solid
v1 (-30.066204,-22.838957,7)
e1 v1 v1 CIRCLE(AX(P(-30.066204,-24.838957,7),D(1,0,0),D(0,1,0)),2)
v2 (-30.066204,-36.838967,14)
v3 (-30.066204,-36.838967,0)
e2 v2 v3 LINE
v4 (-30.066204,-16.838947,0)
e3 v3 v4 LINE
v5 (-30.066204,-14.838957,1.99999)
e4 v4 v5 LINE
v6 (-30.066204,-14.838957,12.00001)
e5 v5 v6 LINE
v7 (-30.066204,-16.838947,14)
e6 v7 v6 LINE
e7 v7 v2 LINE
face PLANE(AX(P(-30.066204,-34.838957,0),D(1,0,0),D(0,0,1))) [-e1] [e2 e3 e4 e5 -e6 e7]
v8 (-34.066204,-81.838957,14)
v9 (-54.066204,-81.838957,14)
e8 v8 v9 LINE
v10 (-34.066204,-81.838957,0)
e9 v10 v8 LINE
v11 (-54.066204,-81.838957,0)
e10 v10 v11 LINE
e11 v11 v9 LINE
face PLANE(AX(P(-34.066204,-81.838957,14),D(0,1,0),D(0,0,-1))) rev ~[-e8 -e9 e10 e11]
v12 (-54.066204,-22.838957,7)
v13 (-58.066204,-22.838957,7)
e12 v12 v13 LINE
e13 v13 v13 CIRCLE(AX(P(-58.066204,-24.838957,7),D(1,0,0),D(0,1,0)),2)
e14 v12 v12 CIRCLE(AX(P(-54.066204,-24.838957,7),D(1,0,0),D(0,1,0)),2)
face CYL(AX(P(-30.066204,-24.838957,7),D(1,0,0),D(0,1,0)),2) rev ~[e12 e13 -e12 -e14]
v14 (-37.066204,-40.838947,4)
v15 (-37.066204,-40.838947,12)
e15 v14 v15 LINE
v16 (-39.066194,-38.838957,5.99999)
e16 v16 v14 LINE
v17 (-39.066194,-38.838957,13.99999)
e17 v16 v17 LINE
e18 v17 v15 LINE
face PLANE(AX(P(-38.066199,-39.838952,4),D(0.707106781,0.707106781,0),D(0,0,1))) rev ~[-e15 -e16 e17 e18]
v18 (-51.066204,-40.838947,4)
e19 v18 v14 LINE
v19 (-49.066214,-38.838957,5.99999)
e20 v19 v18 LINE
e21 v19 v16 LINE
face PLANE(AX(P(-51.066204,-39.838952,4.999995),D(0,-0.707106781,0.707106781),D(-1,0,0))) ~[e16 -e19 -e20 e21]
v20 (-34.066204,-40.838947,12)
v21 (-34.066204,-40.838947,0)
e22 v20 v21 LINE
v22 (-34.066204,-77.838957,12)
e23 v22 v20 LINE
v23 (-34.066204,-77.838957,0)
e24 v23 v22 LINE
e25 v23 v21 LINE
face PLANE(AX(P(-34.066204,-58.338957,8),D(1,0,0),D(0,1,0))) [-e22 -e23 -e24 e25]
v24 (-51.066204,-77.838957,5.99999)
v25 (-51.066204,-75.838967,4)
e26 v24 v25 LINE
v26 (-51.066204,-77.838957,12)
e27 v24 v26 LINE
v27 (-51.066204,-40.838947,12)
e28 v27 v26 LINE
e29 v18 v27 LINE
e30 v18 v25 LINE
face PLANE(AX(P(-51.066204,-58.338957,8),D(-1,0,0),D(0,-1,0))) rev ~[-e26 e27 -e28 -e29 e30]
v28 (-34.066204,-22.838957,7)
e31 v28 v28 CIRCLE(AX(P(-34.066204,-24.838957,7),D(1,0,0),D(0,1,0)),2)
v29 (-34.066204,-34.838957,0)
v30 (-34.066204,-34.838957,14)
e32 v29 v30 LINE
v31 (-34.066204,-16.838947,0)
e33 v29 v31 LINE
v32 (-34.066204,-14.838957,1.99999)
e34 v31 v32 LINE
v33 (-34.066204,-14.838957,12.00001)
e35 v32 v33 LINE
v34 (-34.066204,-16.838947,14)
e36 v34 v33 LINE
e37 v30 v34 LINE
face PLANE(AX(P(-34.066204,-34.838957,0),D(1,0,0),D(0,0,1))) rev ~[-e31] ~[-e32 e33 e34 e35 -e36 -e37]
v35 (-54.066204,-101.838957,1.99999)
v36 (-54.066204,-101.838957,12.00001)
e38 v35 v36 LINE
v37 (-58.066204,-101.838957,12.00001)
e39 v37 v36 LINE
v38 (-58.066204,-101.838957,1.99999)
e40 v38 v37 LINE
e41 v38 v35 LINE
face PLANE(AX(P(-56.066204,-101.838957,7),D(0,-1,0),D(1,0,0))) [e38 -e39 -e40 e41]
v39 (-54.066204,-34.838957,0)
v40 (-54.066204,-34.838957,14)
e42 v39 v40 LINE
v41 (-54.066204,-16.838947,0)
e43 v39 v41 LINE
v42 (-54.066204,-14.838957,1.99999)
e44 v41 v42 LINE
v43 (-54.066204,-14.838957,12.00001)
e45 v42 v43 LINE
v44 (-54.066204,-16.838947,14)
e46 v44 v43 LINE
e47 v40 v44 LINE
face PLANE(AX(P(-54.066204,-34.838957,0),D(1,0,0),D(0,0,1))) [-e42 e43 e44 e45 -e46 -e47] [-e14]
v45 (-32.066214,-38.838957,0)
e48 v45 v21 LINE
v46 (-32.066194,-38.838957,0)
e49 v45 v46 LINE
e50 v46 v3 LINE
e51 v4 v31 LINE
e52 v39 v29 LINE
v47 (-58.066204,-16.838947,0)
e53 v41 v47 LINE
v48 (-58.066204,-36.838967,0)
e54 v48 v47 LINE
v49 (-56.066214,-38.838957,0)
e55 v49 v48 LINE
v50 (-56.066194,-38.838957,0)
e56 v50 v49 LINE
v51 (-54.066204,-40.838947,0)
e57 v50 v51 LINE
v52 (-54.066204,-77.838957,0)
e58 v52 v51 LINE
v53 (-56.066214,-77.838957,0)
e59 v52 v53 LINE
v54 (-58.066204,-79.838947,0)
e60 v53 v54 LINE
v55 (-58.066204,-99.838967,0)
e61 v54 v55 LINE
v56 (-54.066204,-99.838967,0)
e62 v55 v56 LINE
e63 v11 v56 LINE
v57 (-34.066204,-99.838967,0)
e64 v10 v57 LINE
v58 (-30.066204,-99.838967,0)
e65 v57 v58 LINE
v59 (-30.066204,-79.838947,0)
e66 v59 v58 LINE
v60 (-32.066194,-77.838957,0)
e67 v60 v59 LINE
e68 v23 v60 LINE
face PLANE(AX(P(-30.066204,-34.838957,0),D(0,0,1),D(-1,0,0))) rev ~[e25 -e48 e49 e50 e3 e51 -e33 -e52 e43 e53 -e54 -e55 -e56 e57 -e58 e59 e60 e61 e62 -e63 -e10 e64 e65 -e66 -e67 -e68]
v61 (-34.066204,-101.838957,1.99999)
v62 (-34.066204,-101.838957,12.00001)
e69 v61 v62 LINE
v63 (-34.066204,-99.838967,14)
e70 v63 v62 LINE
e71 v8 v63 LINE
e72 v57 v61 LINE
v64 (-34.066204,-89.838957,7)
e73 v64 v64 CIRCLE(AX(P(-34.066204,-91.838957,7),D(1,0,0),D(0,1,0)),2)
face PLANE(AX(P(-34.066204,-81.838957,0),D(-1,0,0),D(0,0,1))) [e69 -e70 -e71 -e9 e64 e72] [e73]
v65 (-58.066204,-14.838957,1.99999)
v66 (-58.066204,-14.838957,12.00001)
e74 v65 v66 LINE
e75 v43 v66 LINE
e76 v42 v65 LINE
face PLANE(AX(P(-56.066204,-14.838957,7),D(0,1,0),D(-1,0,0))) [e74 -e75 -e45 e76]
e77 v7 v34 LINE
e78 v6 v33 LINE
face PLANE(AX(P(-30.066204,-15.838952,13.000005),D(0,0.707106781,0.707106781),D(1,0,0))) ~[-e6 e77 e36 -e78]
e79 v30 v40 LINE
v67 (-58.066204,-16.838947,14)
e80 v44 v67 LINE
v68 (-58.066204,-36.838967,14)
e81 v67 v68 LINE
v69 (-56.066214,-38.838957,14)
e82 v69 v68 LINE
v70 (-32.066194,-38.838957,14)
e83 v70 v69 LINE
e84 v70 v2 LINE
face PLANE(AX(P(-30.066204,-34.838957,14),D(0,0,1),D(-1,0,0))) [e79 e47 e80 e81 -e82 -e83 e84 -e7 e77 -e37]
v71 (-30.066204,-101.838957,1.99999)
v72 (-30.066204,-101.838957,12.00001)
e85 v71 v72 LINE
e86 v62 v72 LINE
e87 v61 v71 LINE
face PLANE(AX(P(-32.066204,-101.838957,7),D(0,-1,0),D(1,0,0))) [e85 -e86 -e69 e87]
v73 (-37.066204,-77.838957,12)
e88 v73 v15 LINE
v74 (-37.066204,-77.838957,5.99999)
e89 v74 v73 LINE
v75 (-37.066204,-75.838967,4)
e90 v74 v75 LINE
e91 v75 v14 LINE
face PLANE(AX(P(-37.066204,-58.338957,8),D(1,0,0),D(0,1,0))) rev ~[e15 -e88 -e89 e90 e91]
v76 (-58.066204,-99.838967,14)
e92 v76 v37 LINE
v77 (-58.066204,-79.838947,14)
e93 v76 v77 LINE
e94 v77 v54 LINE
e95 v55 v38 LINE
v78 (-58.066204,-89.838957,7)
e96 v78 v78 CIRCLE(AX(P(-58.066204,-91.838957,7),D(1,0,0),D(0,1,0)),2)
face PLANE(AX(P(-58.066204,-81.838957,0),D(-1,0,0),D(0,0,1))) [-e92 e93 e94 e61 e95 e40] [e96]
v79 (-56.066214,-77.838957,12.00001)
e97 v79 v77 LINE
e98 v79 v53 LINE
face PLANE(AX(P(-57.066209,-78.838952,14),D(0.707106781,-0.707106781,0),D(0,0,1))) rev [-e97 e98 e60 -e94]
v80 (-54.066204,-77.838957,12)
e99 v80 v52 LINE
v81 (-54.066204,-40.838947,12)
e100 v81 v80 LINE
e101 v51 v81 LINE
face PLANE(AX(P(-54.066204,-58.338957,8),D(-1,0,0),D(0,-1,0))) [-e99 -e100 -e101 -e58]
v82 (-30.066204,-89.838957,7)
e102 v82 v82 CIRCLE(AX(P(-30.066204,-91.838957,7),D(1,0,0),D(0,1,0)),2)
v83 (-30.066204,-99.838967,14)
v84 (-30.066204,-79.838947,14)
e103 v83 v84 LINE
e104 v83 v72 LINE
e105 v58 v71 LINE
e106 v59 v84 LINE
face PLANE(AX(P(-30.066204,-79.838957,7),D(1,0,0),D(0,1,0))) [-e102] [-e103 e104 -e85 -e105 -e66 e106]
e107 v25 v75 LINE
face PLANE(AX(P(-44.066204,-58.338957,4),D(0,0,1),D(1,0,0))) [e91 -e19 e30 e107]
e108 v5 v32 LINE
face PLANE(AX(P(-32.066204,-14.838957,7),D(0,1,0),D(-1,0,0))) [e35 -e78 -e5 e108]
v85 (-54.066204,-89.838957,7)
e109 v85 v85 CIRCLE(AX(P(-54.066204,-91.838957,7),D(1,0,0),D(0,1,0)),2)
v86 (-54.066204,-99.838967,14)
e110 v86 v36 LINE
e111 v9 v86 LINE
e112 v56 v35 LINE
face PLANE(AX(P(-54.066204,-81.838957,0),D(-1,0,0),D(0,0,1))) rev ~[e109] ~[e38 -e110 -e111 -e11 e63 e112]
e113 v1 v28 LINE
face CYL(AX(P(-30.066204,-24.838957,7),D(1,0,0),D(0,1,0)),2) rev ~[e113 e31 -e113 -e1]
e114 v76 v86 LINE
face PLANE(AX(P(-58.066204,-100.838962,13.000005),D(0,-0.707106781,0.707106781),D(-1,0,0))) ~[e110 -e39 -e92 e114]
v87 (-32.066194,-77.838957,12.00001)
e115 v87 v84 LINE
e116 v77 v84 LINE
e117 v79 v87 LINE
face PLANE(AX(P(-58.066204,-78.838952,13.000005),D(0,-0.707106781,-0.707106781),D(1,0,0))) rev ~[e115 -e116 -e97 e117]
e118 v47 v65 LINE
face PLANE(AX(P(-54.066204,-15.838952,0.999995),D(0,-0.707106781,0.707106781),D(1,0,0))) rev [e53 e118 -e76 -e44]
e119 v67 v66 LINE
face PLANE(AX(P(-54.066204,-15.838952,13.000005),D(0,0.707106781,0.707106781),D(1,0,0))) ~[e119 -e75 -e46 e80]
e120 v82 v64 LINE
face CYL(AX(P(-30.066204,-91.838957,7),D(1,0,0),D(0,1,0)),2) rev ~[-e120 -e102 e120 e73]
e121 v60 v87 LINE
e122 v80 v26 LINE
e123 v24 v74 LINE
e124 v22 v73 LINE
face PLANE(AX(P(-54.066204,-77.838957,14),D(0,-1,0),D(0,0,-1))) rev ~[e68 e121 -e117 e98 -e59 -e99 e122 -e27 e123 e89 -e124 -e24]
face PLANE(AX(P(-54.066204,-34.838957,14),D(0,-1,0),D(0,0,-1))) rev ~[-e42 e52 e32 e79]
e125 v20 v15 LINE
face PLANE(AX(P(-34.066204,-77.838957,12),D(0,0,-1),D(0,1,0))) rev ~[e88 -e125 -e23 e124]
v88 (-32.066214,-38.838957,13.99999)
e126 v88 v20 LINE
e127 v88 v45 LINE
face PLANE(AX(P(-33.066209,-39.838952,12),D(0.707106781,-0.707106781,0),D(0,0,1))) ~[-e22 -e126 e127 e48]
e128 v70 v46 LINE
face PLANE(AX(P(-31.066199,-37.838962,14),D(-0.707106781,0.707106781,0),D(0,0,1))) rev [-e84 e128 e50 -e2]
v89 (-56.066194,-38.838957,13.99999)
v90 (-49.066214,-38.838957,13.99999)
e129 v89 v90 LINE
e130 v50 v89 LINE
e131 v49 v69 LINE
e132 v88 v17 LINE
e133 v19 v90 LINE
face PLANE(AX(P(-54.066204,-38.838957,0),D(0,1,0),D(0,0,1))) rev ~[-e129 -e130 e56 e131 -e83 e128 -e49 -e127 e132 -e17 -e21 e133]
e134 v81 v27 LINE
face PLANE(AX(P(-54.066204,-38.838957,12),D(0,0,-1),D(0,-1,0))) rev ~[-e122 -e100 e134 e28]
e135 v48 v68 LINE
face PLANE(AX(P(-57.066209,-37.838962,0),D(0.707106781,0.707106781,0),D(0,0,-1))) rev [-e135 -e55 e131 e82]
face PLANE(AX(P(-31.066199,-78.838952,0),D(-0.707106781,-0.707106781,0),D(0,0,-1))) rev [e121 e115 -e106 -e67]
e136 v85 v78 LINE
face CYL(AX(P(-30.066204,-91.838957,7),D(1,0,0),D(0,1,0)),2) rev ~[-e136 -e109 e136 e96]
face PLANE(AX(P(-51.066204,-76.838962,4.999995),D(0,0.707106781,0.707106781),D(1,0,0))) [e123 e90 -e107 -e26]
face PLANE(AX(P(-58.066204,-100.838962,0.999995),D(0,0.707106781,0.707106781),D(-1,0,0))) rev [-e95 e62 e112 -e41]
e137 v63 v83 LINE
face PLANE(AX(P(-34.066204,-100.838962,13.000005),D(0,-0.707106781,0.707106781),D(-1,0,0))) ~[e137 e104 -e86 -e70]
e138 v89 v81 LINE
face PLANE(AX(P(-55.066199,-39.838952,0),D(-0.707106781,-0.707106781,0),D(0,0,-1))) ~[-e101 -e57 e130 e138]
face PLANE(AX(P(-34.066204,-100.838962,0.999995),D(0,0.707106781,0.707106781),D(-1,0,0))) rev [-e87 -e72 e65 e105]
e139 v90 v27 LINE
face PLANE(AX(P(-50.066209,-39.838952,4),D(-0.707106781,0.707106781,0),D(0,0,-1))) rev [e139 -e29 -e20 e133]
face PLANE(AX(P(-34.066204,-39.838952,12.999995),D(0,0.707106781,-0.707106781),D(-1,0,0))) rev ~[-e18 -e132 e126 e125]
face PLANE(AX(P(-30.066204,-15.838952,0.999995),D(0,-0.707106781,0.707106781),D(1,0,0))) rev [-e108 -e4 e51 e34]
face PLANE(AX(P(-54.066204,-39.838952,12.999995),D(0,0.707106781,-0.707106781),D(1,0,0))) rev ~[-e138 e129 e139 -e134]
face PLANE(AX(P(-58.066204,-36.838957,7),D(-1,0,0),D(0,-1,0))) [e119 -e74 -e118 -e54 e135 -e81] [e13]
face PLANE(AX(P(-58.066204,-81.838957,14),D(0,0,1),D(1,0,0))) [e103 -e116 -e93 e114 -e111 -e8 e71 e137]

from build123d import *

# Parameters (mm, degrees)
F0_W            = 20
F0_H            = 22
F0_H_2          = 4
F0_H_3          = 20.4
F1_DEPTH        = 2
F2_DEPTH        = 10
F3_R            = 2.2
F4_DEPTH        = 30
F5_W            = 20
F5_H            = 12
F5_R            = 2.6
F7_DEPTH        = 4
F6_W            = 20
F6_H            = 12
F6_R            = 2.6
F8_DEPTH        = 4
F9_T1_DEPTH     = 25
F9_T3_DEPTH     = 57.4
F9_T5_DEPTH     = 16
F9_T7_DEPTH     = 48.4
F9_T9_DEPTH     = 2
F9_T11_DEPTH    = 20
F9_T13_DEPTH    = 7
F9_T15_DEPTH    = 25
F9_T17_DEPTH    = 14
F9_T19_DEPTH    = 27
F9_T21_DEPTH    = 14
F9_T23_DEPTH    = 30
F9_T25_DEPTH    = 7
F9_T27_DEPTH    = 8
F9_S31_W        = 2
F9_S31_H        = 2
F9_T32_DEPTH    = 2
F9_S37_W        = 2
F9_S37_H        = 2
F9_T38_DEPTH    = 2
F9_S43_W        = 2
F9_S43_H        = 2
F9_T44_DEPTH    = 2
F9_S49_W        = 2
F9_S49_H        = 2
F9_T50_DEPTH    = 2
F9_S55_W        = 2
F9_S55_H        = 2
F9_T56_DEPTH    = 2
F9_S61_W        = 2
F9_S61_H        = 2
F9_T62_DEPTH    = 2
F9_S67_W        = 2
F9_S67_H        = 2
F9_T68_DEPTH    = 2
F9_S73_W        = 2
F9_S73_H        = 2
F9_T74_DEPTH    = 2
F9_T81_DEPTH    = 30
F9_T85_DEPTH    = 30
F9_T92_DEPTH    = 7
F9_T96_DEPTH    = 53.4
F9_T103_DEPTH   = 30
F9_T107_DEPTH   = 30
F9_S1_T1_DEPTH  = 7
F9_S1_T3_DEPTH  = 30
F9_S1_T5_DEPTH  = 16
F9_S1_T7_DEPTH  = 8
F9_S1_S11_W     = 2
F9_S1_S11_H     = 2
F9_S1_T12_DEPTH = 2
F9_S1_S17_W     = 2
F9_S1_S17_H     = 2
F9_S1_T18_DEPTH = 2
F9_S1_S23_W     = 2
F9_S1_S23_H     = 2
F9_S1_T24_DEPTH = 2
F9_S1_S29_W     = 2
F9_S1_S29_H     = 2
F9_S1_T30_DEPTH = 2
F10_W           = 20
F10_H           = 47
F11_DEPTH       = 4
F12_W           = 20
F12_H           = 4
F13_DEPTH       = 10
F16_DEPTH       = 4
F17_DEPTH       = 4
F19_W           = 4
F19_H           = 14
F20_DEPTH       = 20
F18_W           = 4
F18_H           = 14
F21_DEPTH       = 20
F22_W           = 39
F22_H           = 8
F23_DEPTH       = 3
F24_W           = 39
F24_H           = 8
F25_DEPTH       = 3
F26_R           = 2
F27_R           = 2
F28_DEPTH       = 28.3421242009
F29_SIZE        = 1.99999


# Not quite as in the source:
# - a fillet or chamfer that OpenCascade refuses, or shapes differently, is made with other operations: its cross-section is extruded or revolved along the edge and cut away or added
# - a fillet or chamfer is up to 0.001 mm smaller than in the source, because OpenCascade refuses the exact size
# - a feature names something its author has since deleted; it is built from what else it names


with BuildPart() as f1:
    # F0 (on Top) → F1 (new body)
    with BuildSketch(Plane.XY):
        with Locations((-44.4073281825, 48.6883277684)):
            Rectangle(F0_W, F0_H)
        with Locations((-44.4073281825, 61.6883277684)):
            Rectangle(F0_W, F0_H_2)
        with Locations((-44.4073281825, 35.6883277684)):
            Rectangle(F0_W, F0_H_2)
        with Locations((-44.4073281825, 23.4883277684)):
            Rectangle(F0_W, F0_H_3)
        with Locations((-44.4073281825, 11.2883277684)):
            Rectangle(F0_W, F0_H_2)
    extrude(amount=-F1_DEPTH)

    # F0 (on Top) → F2 (join)
    with BuildSketch(Plane.XY):
        with Locations((-44.4073281825, 35.6883277684)):
            Rectangle(F0_W, F0_H_2)
        with Locations((-44.4073281825, 61.6883277684)):
            Rectangle(F0_W, F0_H_2)
        with Locations((-44.4073281825, 11.2883277684)):
            Rectangle(F0_W, F0_H_2)
    extrude(amount=F2_DEPTH)

    # F3 (on face) → F4 (cut)
    with BuildSketch(Plane.XZ.offset(-9.2883277684)):
        with Locations((-44.4073281825, 5.5)):
            Circle(F3_R)
    extrude(amount=-F4_DEPTH, mode=Mode.SUBTRACT)

    # F5 (on face) → F7 (join)
    with BuildSketch(Plane(origin=(-54.4073281825, 0, 0), x_dir=(0, -1, 0), z_dir=(-1, 0, 0))):
        with Locations((-73.6883277684, 4)):
            Rectangle(F5_W, F5_H)
        with Locations((-73.6883277684, 4)):
            Circle(F5_R, mode=Mode.SUBTRACT)
    extrude(amount=F7_DEPTH)

    # F6 (on face) → F8 (join)
    with BuildSketch(Plane.YZ.offset(-34.4073281825)):
        with Locations((73.6883277684, 4)):
            Rectangle(F6_W, F6_H)
        with Locations((73.6883277684, 4)):
            Circle(F6_R, mode=Mode.SUBTRACT)
        Polygon((63.6883277684, 10), (59.6883277684, 10), (59.6883277684, 0), (59.6883277684, -2), (63.6883277684, -2), align=None)
    extrude(amount=F8_DEPTH)

    # F9: fillet of radius 2 on 26 edges, made by hand

    # F9_s2 → F9_t1 (cut)
    with BuildSketch(Plane.YZ.offset(-59.4073281825)):
        with BuildLine():
            ThreePointArc((63.6883277684, 0), (63.1025413308, -1.4142135624), (61.6883277684, -2))
            Line((61.6883277684, -2), (63.6883277684, -2))
            Line((63.6883277684, -2), (63.6883277684, 0))
        make_face()
        with BuildLine():
            ThreePointArc((63.6883277684, 8), (63.1025413308, 9.4142135624), (61.6883277684, 10))
            Line((61.6883277684, 10), (63.6883277684, 10))
            Line((63.6883277684, 10), (63.6883277684, 8))
        make_face()
    extrude(amount=F9_T1_DEPTH, mode=Mode.SUBTRACT)

    # F9_s4 → F9_t3 (cut)
    with BuildSketch(Plane.XZ.offset(-68.6883277684)):
        with BuildLine():
            ThreePointArc((-54.4073281825, 0), (-53.8215417448, -1.4142135624), (-52.4073281825, -2))
            Line((-52.4073281825, -2), (-54.4073281825, -2))
            Line((-54.4073281825, -2), (-54.4073281825, 0))
        make_face()
    extrude(amount=F9_T3_DEPTH, mode=Mode.SUBTRACT)

    # F9_s6 → F9_t5 (cut)
    with BuildSketch(Plane.YZ.offset(-52.4073281825)):
        with BuildLine():
            ThreePointArc((9.2883277684, 0), (9.8741142061, -1.4142135624), (11.2883277684, -2))
            Line((11.2883277684, -2), (9.2883277684, -2))
            Line((9.2883277684, -2), (9.2883277684, 0))
        make_face()
        with BuildLine():
            ThreePointArc((9.2883277684, 8), (9.8741142061, 9.4142135624), (11.2883277684, 10))
            Line((11.2883277684, 10), (9.2883277684, 10))
            Line((9.2883277684, 10), (9.2883277684, 8))
        make_face()
    extrude(amount=F9_T5_DEPTH, mode=Mode.SUBTRACT)

    # F9_s8 → F9_t7 (cut)
    with BuildSketch(Plane.XZ.offset(-59.6883277684)):
        with BuildLine():
            ThreePointArc((-34.4073281825, 0), (-34.9931146201, -1.4142135624), (-36.4073281825, -2))
            Line((-36.4073281825, -2), (-34.4073281825, -2))
            Line((-34.4073281825, -2), (-34.4073281825, 0))
        make_face()
    extrude(amount=F9_T7_DEPTH, mode=Mode.SUBTRACT)

    # F9_s10 → F9_t9 (cut)
    with BuildSketch(Plane.YZ.offset(-34.4073281825)):
        with BuildLine():
            ThreePointArc((59.6883277684, 0), (60.2741142061, -1.4142135624), (61.6883277684, -2))
            Line((61.6883277684, -2), (59.6883277684, -2))
            Line((59.6883277684, -2), (59.6883277684, 0))
        make_face()
    extrude(amount=F9_T9_DEPTH, mode=Mode.SUBTRACT)

    # F9_s12 → F9_t11 (cut)
    with BuildSketch(Plane.XZ.offset(-81.6883277684)):
        with BuildLine():
            ThreePointArc((-30.4073281825, 0), (-30.9931146201, -1.4142135624), (-32.4073281825, -2))
            Line((-32.4073281825, -2), (-30.4073281825, -2))
            Line((-30.4073281825, -2), (-30.4073281825, 0))
        make_face()
        with BuildLine():
            ThreePointArc((-30.4073281825, 8), (-30.9931146201, 9.4142135624), (-32.4073281825, 10))
            Line((-32.4073281825, 10), (-30.4073281825, 10))
            Line((-30.4073281825, 10), (-30.4073281825, 8))
        make_face()
    extrude(amount=F9_T11_DEPTH, mode=Mode.SUBTRACT)

    # F9_s14 → F9_t13 (cut)
    with BuildSketch(Plane.YZ.offset(-39.4073281825)):
        with BuildLine():
            ThreePointArc((83.6883277684, 0), (83.1025413308, -1.4142135624), (81.6883277684, -2))
            Line((81.6883277684, -2), (83.6883277684, -2))
            Line((83.6883277684, -2), (83.6883277684, 0))
        make_face()
        with BuildLine():
            ThreePointArc((83.6883277684, 8), (83.1025413308, 9.4142135624), (81.6883277684, 10))
            Line((81.6883277684, 10), (83.6883277684, 10))
            Line((83.6883277684, 10), (83.6883277684, 8))
        make_face()
    extrude(amount=F9_T13_DEPTH, mode=Mode.SUBTRACT)

    # F9_s16 → F9_t15 (cut)
    with BuildSketch(Plane.XZ.offset(-88.6883277684)):
        with BuildLine():
            ThreePointArc((-34.4073281825, 0), (-33.8215417448, -1.4142135624), (-32.4073281825, -2))
            Line((-32.4073281825, -2), (-34.4073281825, -2))
            Line((-34.4073281825, -2), (-34.4073281825, 0))
        make_face()
        with BuildLine():
            ThreePointArc((-34.4073281825, 8), (-33.8215417448, 9.4142135624), (-32.4073281825, 10))
            Line((-32.4073281825, 10), (-34.4073281825, 10))
            Line((-34.4073281825, 10), (-34.4073281825, 8))
        make_face()
    extrude(amount=F9_T15_DEPTH, mode=Mode.SUBTRACT)

    # F9_s18 → F9_t17 (cut)
    with BuildSketch(Plane.XZ.offset(-68.6883277684)):
        with BuildLine():
            ThreePointArc((-52.4073281825, 10), (-53.8215417448, 9.4142135624), (-54.4073281825, 8))
            Line((-54.4073281825, 8), (-54.4073281825, 10))
            Line((-54.4073281825, 10), (-52.4073281825, 10))
        make_face()
    extrude(amount=F9_T17_DEPTH, mode=Mode.SUBTRACT)

    # F9_s20 → F9_t19 (cut)
    with BuildSketch(Plane.YZ.offset(-59.4073281825)):
        with BuildLine():
            ThreePointArc((59.6883277684, 8), (60.2741142061, 9.4142135624), (61.6883277684, 10))
            Line((61.6883277684, 10), (59.6883277684, 10))
            Line((59.6883277684, 10), (59.6883277684, 8))
        make_face()
    extrude(amount=F9_T19_DEPTH, mode=Mode.SUBTRACT)

    # F9_s22 → F9_t21 (cut)
    with BuildSketch(Plane.XZ.offset(-42.6883277684)):
        with BuildLine():
            ThreePointArc((-52.4073281825, 10), (-53.8215417448, 9.4142135624), (-54.4073281825, 8))
            Line((-54.4073281825, 8), (-54.4073281825, 10))
            Line((-54.4073281825, 10), (-52.4073281825, 10))
        make_face()
        with BuildLine():
            ThreePointArc((-36.4073281825, 10), (-34.9931146201, 9.4142135624), (-34.4073281825, 8))
            Line((-34.4073281825, 8), (-34.4073281825, 10))
            Line((-34.4073281825, 10), (-36.4073281825, 10))
        make_face()
    extrude(amount=F9_T21_DEPTH, mode=Mode.SUBTRACT)

    # F9_s24 → F9_t23 (cut)
    with BuildSketch(Plane.YZ.offset(-59.4073281825)):
        with BuildLine():
            ThreePointArc((33.6883277684, 8), (34.2741142061, 9.4142135624), (35.6883277684, 10))
            Line((35.6883277684, 10), (33.6883277684, 10))
            Line((33.6883277684, 10), (33.6883277684, 8))
        make_face()
        with BuildLine():
            ThreePointArc((37.6883277684, 8), (37.1025413308, 9.4142135624), (35.6883277684, 10))
            Line((35.6883277684, 10), (37.6883277684, 10))
            Line((37.6883277684, 10), (37.6883277684, 8))
        make_face()
        with BuildLine():
            ThreePointArc((13.2883277684, 8), (12.7025413308, 9.4142135624), (11.2883277684, 10))
            Line((11.2883277684, 10), (13.2883277684, 10))
            Line((13.2883277684, 10), (13.2883277684, 8))
        make_face()
    extrude(amount=F9_T23_DEPTH, mode=Mode.SUBTRACT)

    # F9_s26 → F9_t25 (cut)
    with BuildSketch(Plane.XZ.offset(-18.2883277684)):
        with BuildLine():
            ThreePointArc((-36.4073281825, 10), (-34.9931146201, 9.4142135624), (-34.4073281825, 8))
            Line((-34.4073281825, 8), (-34.4073281825, 10))
            Line((-34.4073281825, 10), (-36.4073281825, 10))
        make_face()
        with BuildLine():
            ThreePointArc((-52.4073281825, 10), (-53.8215417448, 9.4142135624), (-54.4073281825, 8))
            Line((-54.4073281825, 8), (-54.4073281825, 10))
            Line((-54.4073281825, 10), (-52.4073281825, 10))
        make_face()
    extrude(amount=F9_T25_DEPTH, mode=Mode.SUBTRACT)

    # F9_s28 → F9_t27 (cut)
    with BuildSketch(Plane.XY):
        with BuildLine():
            ThreePointArc((-36.4073281825, 9.2883277684), (-34.9931146201, 9.8741142061), (-34.4073281825, 11.2883277684))
            Line((-34.4073281825, 11.2883277684), (-34.4073281825, 9.2883277684))
            Line((-34.4073281825, 9.2883277684), (-36.4073281825, 9.2883277684))
        make_face()
        with BuildLine():
            ThreePointArc((-52.4073281825, 9.2883277684), (-53.8215417448, 9.8741142061), (-54.4073281825, 11.2883277684))
            Line((-54.4073281825, 11.2883277684), (-54.4073281825, 9.2883277684))
            Line((-54.4073281825, 9.2883277684), (-52.4073281825, 9.2883277684))
        make_face()
        with BuildLine():
            ThreePointArc((-30.4073281825, 61.6883277684), (-30.9931146201, 60.2741142061), (-32.4073281825, 59.6883277684))
            Line((-32.4073281825, 59.6883277684), (-30.4073281825, 59.6883277684))
            Line((-30.4073281825, 59.6883277684), (-30.4073281825, 61.6883277684))
        make_face()
        with BuildLine():
            ThreePointArc((-30.4073281825, 81.6883277684), (-30.9931146201, 83.1025413308), (-32.4073281825, 83.6883277684))
            Line((-32.4073281825, 83.6883277684), (-30.4073281825, 83.6883277684))
            Line((-30.4073281825, 83.6883277684), (-30.4073281825, 81.6883277684))
        make_face()
    extrude(amount=F9_T27_DEPTH, mode=Mode.SUBTRACT)


with BuildPart() as f9_tool30:
    # F9_s31 → F9_t32 (new body)
    with BuildSketch(Plane.YZ.offset(-52.4073281825)):
        with Locations((10.2883277684, -1)):
            Rectangle(F9_S31_W, F9_S31_H)
    extrude(amount=-F9_T32_DEPTH)

    # F9_s33 → F9_t34 (revolve, cut)
    with BuildSketch(Plane(origin=(-52.4073281825, 11.2883277684, 0), x_dir=(0, 0.7071067812, 0.7071067812), z_dir=(0, -0.7071067812, 0.7071067812))):
        with BuildLine():
            ThreePointArc((0, -2), (2, 0), (0, 2))
            Line((0, 2), (0, -2))
        make_face()
    revolve(axis=Axis((-52.4073281825, 11.2883277684, 0), (-1, 0, 0)), mode=Mode.SUBTRACT)


with BuildPart() as f1_1:
    add(f1.part)

    # F9_t29: cut F9_tool30
    add(f9_tool30.part, mode=Mode.SUBTRACT)


with BuildPart() as f9_tool36:
    # F9_s37 → F9_t38 (new body)
    with BuildSketch(Plane.XY):
        with Locations((-35.4073281825, 10.2883277684)):
            Rectangle(F9_S37_W, F9_S37_H)
    extrude(amount=-F9_T38_DEPTH)

    # F9_s39 → F9_t40 (revolve, cut)
    with BuildSketch(Plane(origin=(-36.4073281825, 11.2883277684, 0), x_dir=(-0.7071067812, 0.7071067812, 0), z_dir=(-0.7071067812, -0.7071067812, 0))):
        with BuildLine():
            ThreePointArc((0, -2), (2, 0), (0, 2))
            Line((0, 2), (0, -2))
        make_face()
    revolve(axis=Axis((-36.4073281825, 11.2883277684, 0), (0, 0, -1)), mode=Mode.SUBTRACT)


with BuildPart() as f1_2:
    add(f1_1.part)

    # F9_t35: cut F9_tool36
    add(f9_tool36.part, mode=Mode.SUBTRACT)


with BuildPart() as f9_tool42:
    # F9_s43 → F9_t44 (new body)
    with BuildSketch(Plane.YZ.offset(-32.4073281825)):
        with Locations((60.6883277684, -1)):
            Rectangle(F9_S43_W, F9_S43_H)
    extrude(amount=F9_T44_DEPTH)

    # F9_s45 → F9_t46 (revolve, cut)
    with BuildSketch(Plane(origin=(-32.4073281825, 61.6883277684, 0), x_dir=(0, 0.7071067812, 0.7071067812), z_dir=(0, 0.7071067812, -0.7071067812))):
        with BuildLine():
            ThreePointArc((0, -2), (2, 0), (0, 2))
            Line((0, 2), (0, -2))
        make_face()
    revolve(axis=Axis((-32.4073281825, 61.6883277684, 0), (1, 0, 0)), mode=Mode.SUBTRACT)


with BuildPart() as f1_3:
    add(f1_2.part)

    # F9_t41: cut F9_tool42
    add(f9_tool42.part, mode=Mode.SUBTRACT)


with BuildPart() as f9_tool48:
    # F9_s49 → F9_t50 (new body)
    with BuildSketch(Plane.XY):
        with Locations((-31.4073281825, 82.6883277684)):
            Rectangle(F9_S49_W, F9_S49_H)
    extrude(amount=-F9_T50_DEPTH)

    # F9_s51 → F9_t52 (revolve, cut)
    with BuildSketch(Plane(origin=(-32.4073281825, 81.6883277684, 0), x_dir=(-0.7071067812, -0.7071067812, 0), z_dir=(0.7071067812, -0.7071067812, 0))):
        with BuildLine():
            ThreePointArc((0, -2), (2, 0), (0, 2))
            Line((0, 2), (0, -2))
        make_face()
    revolve(axis=Axis((-32.4073281825, 81.6883277684, 0), (0, 0, -1)), mode=Mode.SUBTRACT)


with BuildPart() as f1_4:
    add(f1_3.part)

    # F9_t47: cut F9_tool48
    add(f9_tool48.part, mode=Mode.SUBTRACT)


with BuildPart() as f9_tool54:
    # F9_s55 → F9_t56 (new body)
    with BuildSketch(Plane.XY.offset(8)):
        with Locations((-31.4073281825, 60.6883277684)):
            Rectangle(F9_S55_W, F9_S55_H)
    extrude(amount=F9_T56_DEPTH)

    # F9_s57 → F9_t58 (revolve, cut)
    with BuildSketch(Plane(origin=(-32.4073281825, 61.6883277684, 8), x_dir=(-0.7071067812, 0.7071067812, 0), z_dir=(0.7071067812, 0.7071067812, 0))):
        with BuildLine():
            ThreePointArc((0, -2), (2, 0), (0, 2))
            Line((0, 2), (0, -2))
        make_face()
    revolve(axis=Axis((-32.4073281825, 61.6883277684, 8), (0, 0, 1)), mode=Mode.SUBTRACT)


with BuildPart() as f1_5:
    add(f1_4.part)

    # F9_t53: cut F9_tool54
    add(f9_tool54.part, mode=Mode.SUBTRACT)


with BuildPart() as f9_tool60:
    # F9_s61 → F9_t62 (new body)
    with BuildSketch(Plane.XZ.offset(-81.6883277684)):
        with Locations((-31.4073281825, 9)):
            Rectangle(F9_S61_W, F9_S61_H)
    extrude(amount=-F9_T62_DEPTH)

    # F9_s63 → F9_t64 (revolve, cut)
    with BuildSketch(Plane(origin=(-32.4073281825, 81.6883277684, 8), x_dir=(-0.7071067812, 0, -0.7071067812), z_dir=(0.7071067812, 0, -0.7071067812))):
        with BuildLine():
            ThreePointArc((0, -2), (2, 0), (0, 2))
            Line((0, 2), (0, -2))
        make_face()
    revolve(axis=Axis((-32.4073281825, 81.6883277684, 8), (0, 1, 0)), mode=Mode.SUBTRACT)


with BuildPart() as f1_6:
    add(f1_5.part)

    # F9_t59: cut F9_tool60
    add(f9_tool60.part, mode=Mode.SUBTRACT)


with BuildPart() as f9_tool66:
    # F9_s67 → F9_t68 (new body)
    with BuildSketch(Plane.XZ.offset(-11.2883277684)):
        with Locations((-35.4073281825, 9)):
            Rectangle(F9_S67_W, F9_S67_H)
    extrude(amount=F9_T68_DEPTH)

    # F9_s69 → F9_t70 (revolve, cut)
    with BuildSketch(Plane(origin=(-36.4073281825, 11.2883277684, 8), x_dir=(-0.7071067812, 0, -0.7071067812), z_dir=(-0.7071067812, 0, 0.7071067812))):
        with BuildLine():
            ThreePointArc((0, -2), (2, 0), (0, 2))
            Line((0, 2), (0, -2))
        make_face()
    revolve(axis=Axis((-36.4073281825, 11.2883277684, 8), (0, -1, 0)), mode=Mode.SUBTRACT)


with BuildPart() as f1_7:
    add(f1_6.part)

    # F9_t65: cut F9_tool66
    add(f9_tool66.part, mode=Mode.SUBTRACT)


with BuildPart() as f9_tool72:
    # F9_s73 → F9_t74 (new body)
    with BuildSketch(Plane.YZ.offset(-52.4073281825)):
        with Locations((10.2883277684, 9)):
            Rectangle(F9_S73_W, F9_S73_H)
    extrude(amount=-F9_T74_DEPTH)

    # F9_s75 → F9_t76 (revolve, cut)
    with BuildSketch(Plane(origin=(-52.4073281825, 11.2883277684, 8), x_dir=(0, 0.7071067812, -0.7071067812), z_dir=(0, 0.7071067812, 0.7071067812))):
        with BuildLine():
            ThreePointArc((0, -2), (2, 0), (0, 2))
            Line((0, 2), (0, -2))
        make_face()
    revolve(axis=Axis((-52.4073281825, 11.2883277684, 8), (-1, 0, 0)), mode=Mode.SUBTRACT)


with BuildPart() as f1_8:
    add(f1_7.part)

    # F9_t71: cut F9_tool72
    add(f9_tool72.part, mode=Mode.SUBTRACT)


with BuildPart() as f9_tool79:
    # F9_s80 → F9_t81 (new body)
    with BuildSketch(Plane.YZ.offset(-29.4073281825)):
        with BuildLine():
            ThreePointArc((63.6883277684, 0), (63.1025413308, -1.4142135624), (61.6883277684, -2))
            Line((61.6883277684, -2), (63.6883277684, -2))
            Line((63.6883277684, -2), (63.6883277684, 0))
        make_face()
    extrude(amount=-F9_T81_DEPTH)

    split(bisect_by=Plane.YZ.offset(-34.4073281825), keep=Keep.TOP)


with BuildPart() as f9_tool83:
    # F9_s84 → F9_t85 (new body)
    with BuildSketch(Plane.XZ.offset(-58.6883277684)):
        with BuildLine():
            ThreePointArc((-34.4073281825, 0), (-33.8215417448, -1.4142135624), (-32.4073281825, -2))
            Line((-32.4073281825, -2), (-34.4073281825, -2))
            Line((-34.4073281825, -2), (-34.4073281825, 0))
        make_face()
    extrude(amount=-F9_T85_DEPTH)

    split(bisect_by=Plane.XZ.offset(-63.6883277684), keep=Keep.TOP)


with BuildPart() as f9_tool79_1:
    add(f9_tool79.part)

    # F9_t87: intersect F9_tool83
    add(f9_tool83.part, mode=Mode.INTERSECT)


with BuildPart() as f1_9:
    add(f1_8.part)

    # F9_t77: cut F9_tool79
    add(f9_tool79_1.part, mode=Mode.SUBTRACT)


with BuildPart() as f9_tool90:
    # F9_s91 → F9_t92 (new body)
    with BuildSketch(Plane.YZ.offset(-39.4073281825)):
        with BuildLine():
            ThreePointArc((59.6883277684, 0), (60.2741142061, -1.4142135624), (61.6883277684, -2))
            Line((61.6883277684, -2), (59.6883277684, -2))
            Line((59.6883277684, -2), (59.6883277684, 0))
        make_face()
    extrude(amount=F9_T92_DEPTH)

    split(bisect_by=Plane.YZ.offset(-34.4073281825), keep=Keep.BOTTOM)


with BuildPart() as f9_tool94:
    # F9_s95 → F9_t96 (new body)
    with BuildSketch(Plane.XZ.offset(-11.2883277684)):
        with BuildLine():
            ThreePointArc((-34.4073281825, 0), (-34.9931146201, -1.4142135624), (-36.4073281825, -2))
            Line((-36.4073281825, -2), (-34.4073281825, -2))
            Line((-34.4073281825, -2), (-34.4073281825, 0))
        make_face()
    extrude(amount=-F9_T96_DEPTH)

    split(bisect_by=Plane.XZ.offset(-59.6883277684), keep=Keep.BOTTOM)


with BuildPart() as f9_tool90_1:
    add(f9_tool90.part)

    # F9_t98: intersect F9_tool94
    add(f9_tool94.part, mode=Mode.INTERSECT)


with BuildPart() as f1_10:
    add(f1_9.part)

    # F9_t88: cut F9_tool90
    add(f9_tool90_1.part, mode=Mode.SUBTRACT)


with BuildPart() as f9_tool101:
    # F9_s102 → F9_t103 (new body)
    with BuildSketch(Plane.YZ.offset(-29.4073281825)):
        with BuildLine():
            ThreePointArc((63.6883277684, 8), (63.1025413308, 9.4142135624), (61.6883277684, 10))
            Line((61.6883277684, 10), (63.6883277684, 10))
            Line((63.6883277684, 10), (63.6883277684, 8))
        make_face()
    extrude(amount=-F9_T103_DEPTH)

    split(bisect_by=Plane.YZ.offset(-34.4073281825), keep=Keep.TOP)


with BuildPart() as f9_tool105:
    # F9_s106 → F9_t107 (new body)
    with BuildSketch(Plane.XZ.offset(-88.6883277684)):
        with BuildLine():
            ThreePointArc((-34.4073281825, 8), (-33.8215417448, 9.4142135624), (-32.4073281825, 10))
            Line((-32.4073281825, 10), (-34.4073281825, 10))
            Line((-34.4073281825, 10), (-34.4073281825, 8))
        make_face()
    extrude(amount=F9_T107_DEPTH)

    split(bisect_by=Plane.XZ.offset(-63.6883277684), keep=Keep.TOP)


with BuildPart() as f9_tool101_1:
    add(f9_tool101.part)

    # F9_t109: intersect F9_tool105
    add(f9_tool105.part, mode=Mode.INTERSECT)


with BuildPart() as f1_11:
    add(f1_10.part)

    # F9_t99: cut F9_tool101
    add(f9_tool101_1.part, mode=Mode.SUBTRACT)

    # F9#s1: fillet of radius 2 on 10 edges, made by hand

    # F9_s1_s2 → F9_s1_t1 (cut)
    with BuildSketch(Plane.YZ.offset(-56.4073281825)):
        with BuildLine():
            ThreePointArc((83.6883277684, 0), (83.1025413308, -1.4142135624), (81.6883277684, -2))
            Line((81.6883277684, -2), (83.6883277684, -2))
            Line((83.6883277684, -2), (83.6883277684, 0))
        make_face()
        with BuildLine():
            ThreePointArc((63.6883277684, 0), (64.2741142061, -1.4142135624), (65.6883277684, -2))
            Line((65.6883277684, -2), (63.6883277684, -2))
            Line((63.6883277684, -2), (63.6883277684, 0))
        make_face()
        with BuildLine():
            ThreePointArc((63.6883277684, 8), (64.2741142061, 9.4142135624), (65.6883277684, 10))
            Line((65.6883277684, 10), (63.6883277684, 10))
            Line((63.6883277684, 10), (63.6883277684, 8))
        make_face()
        with BuildLine():
            ThreePointArc((81.6883277684, 10), (83.1025413308, 9.4142135624), (83.6883277684, 8))
            Line((83.6883277684, 8), (83.6883277684, 10))
            Line((83.6883277684, 10), (81.6883277684, 10))
        make_face()
    extrude(amount=F9_S1_T1_DEPTH, mode=Mode.SUBTRACT)

    # F9_s1_s4 → F9_s1_t3 (cut)
    with BuildSketch(Plane.XZ.offset(-88.6883277684)):
        with BuildLine():
            ThreePointArc((-56.4073281825, -2), (-54.9931146201, -1.4142135624), (-54.4073281825, 0))
            Line((-54.4073281825, 0), (-54.4073281825, -2))
            Line((-54.4073281825, -2), (-56.4073281825, -2))
        make_face()
        with BuildLine():
            ThreePointArc((-56.4073281825, 10), (-54.9931146201, 9.4142135624), (-54.4073281825, 8))
            Line((-54.4073281825, 8), (-54.4073281825, 10))
            Line((-54.4073281825, 10), (-56.4073281825, 10))
        make_face()
    extrude(amount=F9_S1_T3_DEPTH, mode=Mode.SUBTRACT)

    # F9_s1_s6 → F9_s1_t5 (cut)
    with BuildSketch(Plane.XZ.offset(-81.6883277684)):
        with BuildLine():
            ThreePointArc((-58.4073281825, 0), (-57.8215417448, -1.4142135624), (-56.4073281825, -2))
            Line((-56.4073281825, -2), (-58.4073281825, -2))
            Line((-58.4073281825, -2), (-58.4073281825, 0))
        make_face()
        with BuildLine():
            ThreePointArc((-56.4073281825, 10), (-57.8215417448, 9.4142135624), (-58.4073281825, 8))
            Line((-58.4073281825, 8), (-58.4073281825, 10))
            Line((-58.4073281825, 10), (-56.4073281825, 10))
        make_face()
    extrude(amount=F9_S1_T5_DEPTH, mode=Mode.SUBTRACT)

    # F9_s1_s8 → F9_s1_t7 (cut)
    with BuildSketch(Plane.XY):
        with BuildLine():
            ThreePointArc((-56.4073281825, 63.6883277684), (-57.8215417448, 64.2741142061), (-58.4073281825, 65.6883277684))
            Line((-58.4073281825, 65.6883277684), (-58.4073281825, 63.6883277684))
            Line((-58.4073281825, 63.6883277684), (-56.4073281825, 63.6883277684))
        make_face()
        with BuildLine():
            ThreePointArc((-56.4073281825, 83.6883277684), (-57.8215417448, 83.1025413308), (-58.4073281825, 81.6883277684))
            Line((-58.4073281825, 81.6883277684), (-58.4073281825, 83.6883277684))
            Line((-58.4073281825, 83.6883277684), (-56.4073281825, 83.6883277684))
        make_face()
    extrude(amount=F9_S1_T7_DEPTH, mode=Mode.SUBTRACT)


with BuildPart() as f9_s1_tool10:
    # F9_s1_s11 → F9_s1_t12 (new body)
    with BuildSketch(Plane.XZ.offset(-81.6883277684)):
        with Locations((-57.4073281825, -1)):
            Rectangle(F9_S1_S11_W, F9_S1_S11_H)
    extrude(amount=-F9_S1_T12_DEPTH)

    # F9_s1_s13 → F9_s1_t14 (revolve, cut)
    with BuildSketch(Plane(origin=(-56.4073281825, 81.6883277684, 0), x_dir=(0.7071067812, 0, 0.7071067812), z_dir=(-0.7071067812, 0, 0.7071067812))):
        with BuildLine():
            ThreePointArc((0, -2), (2, 0), (0, 2))
            Line((0, 2), (0, -2))
        make_face()
    revolve(axis=Axis((-56.4073281825, 81.6883277684, 0), (0, 1, 0)), mode=Mode.SUBTRACT)


with BuildPart() as f1_12:
    add(f1_11.part)

    # F9_s1_t9: cut F9_s1_tool10
    add(f9_s1_tool10.part, mode=Mode.SUBTRACT)


with BuildPart() as f9_s1_tool16:
    # F9_s1_s17 → F9_s1_t18 (new body)
    with BuildSketch(Plane.XZ.offset(-65.6883277684)):
        with Locations((-57.4073281825, -1)):
            Rectangle(F9_S1_S17_W, F9_S1_S17_H)
    extrude(amount=F9_S1_T18_DEPTH)

    # F9_s1_s19 → F9_s1_t20 (revolve, cut)
    with BuildSketch(Plane(origin=(-56.4073281825, 65.6883277684, 0), x_dir=(0.7071067812, 0, 0.7071067812), z_dir=(0.7071067812, 0, -0.7071067812))):
        with BuildLine():
            ThreePointArc((0, -2), (2, 0), (0, 2))
            Line((0, 2), (0, -2))
        make_face()
    revolve(axis=Axis((-56.4073281825, 65.6883277684, 0), (0, -1, 0)), mode=Mode.SUBTRACT)


with BuildPart() as f1_13:
    add(f1_12.part)

    # F9_s1_t15: cut F9_s1_tool16
    add(f9_s1_tool16.part, mode=Mode.SUBTRACT)


with BuildPart() as f9_s1_tool22:
    # F9_s1_s23 → F9_s1_t24 (new body)
    with BuildSketch(Plane.XZ.offset(-65.6883277684)):
        with Locations((-57.4073281825, 9)):
            Rectangle(F9_S1_S23_W, F9_S1_S23_H)
    extrude(amount=F9_S1_T24_DEPTH)

    # F9_s1_s25 → F9_s1_t26 (revolve, cut)
    with BuildSketch(Plane(origin=(-56.4073281825, 65.6883277684, 8), x_dir=(0.7071067812, 0, -0.7071067812), z_dir=(-0.7071067812, 0, -0.7071067812))):
        with BuildLine():
            ThreePointArc((0, -2), (2, 0), (0, 2))
            Line((0, 2), (0, -2))
        make_face()
    revolve(axis=Axis((-56.4073281825, 65.6883277684, 8), (0, -1, 0)), mode=Mode.SUBTRACT)


with BuildPart() as f1_14:
    add(f1_13.part)

    # F9_s1_t21: cut F9_s1_tool22
    add(f9_s1_tool22.part, mode=Mode.SUBTRACT)


with BuildPart() as f9_s1_tool28:
    # F9_s1_s29 → F9_s1_t30 (new body)
    with BuildSketch(Plane.XY.offset(8)):
        with Locations((-57.4073281825, 82.6883277684)):
            Rectangle(F9_S1_S29_W, F9_S1_S29_H)
    extrude(amount=F9_S1_T30_DEPTH)

    # F9_s1_s31 → F9_s1_t32 (revolve, cut)
    with BuildSketch(Plane(origin=(-56.4073281825, 81.6883277684, 8), x_dir=(0.7071067812, -0.7071067812, 0), z_dir=(-0.7071067812, -0.7071067812, 0))):
        with BuildLine():
            ThreePointArc((0, -2), (2, 0), (0, 2))
            Line((0, 2), (0, -2))
        make_face()
    revolve(axis=Axis((-56.4073281825, 81.6883277684, 8), (0, 0, 1)), mode=Mode.SUBTRACT)


with BuildPart() as f1_15:
    add(f1_14.part)

    # F9_s1_t27: cut F9_s1_tool28
    add(f9_s1_tool28.part, mode=Mode.SUBTRACT)


with BuildPart() as f11:
    # F10 (on Top) → F11 (new body)
    with BuildSketch(Plane.XY):
        with Locations((-44.0662039816, -58.3389573097)):
            Rectangle(F10_W, F10_H)
    extrude(amount=F11_DEPTH)

    # F12 (on face) → F13 (join)
    with BuildSketch(Plane.XY.offset(4)):
        with Locations((-44.0662039816, -36.8389573097)):
            Rectangle(F12_W, F12_H)
        with Locations((-44.0662039816, -79.8389573097)):
            Rectangle(F12_W, F12_H)
    extrude(amount=F13_DEPTH)

    # F15 (on face) → F16 (join)
    with BuildSketch(Plane.YZ.offset(-34.0662039816)):
        Polygon((-77.8389573097, 0), (-77.8389573097, 4), (-77.8389573097, 14), (-81.8389573097, 14), (-81.8389573097, 0), align=None)
        Polygon((-38.8389573097, 14), (-38.8389573097, 4), (-38.8389573097, 0), (-34.8389573097, 0), (-34.8389573097, 14), align=None)
    extrude(amount=F16_DEPTH)

    # F14 (on face) → F17 (join)
    with BuildSketch(Plane(origin=(-54.0662039816, 0, 0), x_dir=(0, -1, 0), z_dir=(-1, 0, 0))):
        Polygon((38.8389573097, 0), (38.8389573097, 4), (38.8389573097, 14), (34.8389573097, 14), (34.8389573097, 0), align=None)
        Polygon((77.8389573097, 14), (77.8389573097, 4), (77.8389573097, 0), (81.8389573097, 0), (81.8389573097, 14), align=None)
    extrude(amount=F17_DEPTH)

    # F19 (on face) → F20 (join)
    with BuildSketch(Plane.XZ.offset(81.8389573097)):
        with Locations((-56.0662039816, 7)):
            Rectangle(F19_W, F19_H)
        with Locations((-32.0662039816, 7)):
            Rectangle(F19_W, F19_H)
    extrude(amount=F20_DEPTH)

    # F18 (on face) → F21 (join)
    with BuildSketch(Plane(origin=(0, -34.8389573097, 0), x_dir=(-1, 0, 0), z_dir=(0, 1, 0))):
        with Locations((32.0662039816, 7)):
            Rectangle(F18_W, F18_H)
        with Locations((56.0662039816, 7)):
            Rectangle(F18_W, F18_H)
    extrude(amount=F21_DEPTH)

    # F22 (on face) → F23 (join)
    with BuildSketch(Plane(origin=(-54.0662039816, 0, 0), x_dir=(0, -1, 0), z_dir=(-1, 0, 0))):
        with Locations((58.3389573097, 8)):
            Rectangle(F22_W, F22_H)
    extrude(amount=-F23_DEPTH)

    # F24 (on face) → F25 (join)
    with BuildSketch(Plane.YZ.offset(-34.0662039816)):
        with Locations((-58.3389573097, 8)):
            Rectangle(F24_W, F24_H)
    extrude(amount=-F25_DEPTH)

    # F26 (on face) + F27 (on face) → F28 (cut, through all)
    with BuildSketch(Plane.YZ.offset(-30.0662039816)):
        with Locations((-91.8389573097, 7)):
            Circle(F26_R)
    with BuildSketch(Plane.YZ.offset(-30.0662039816)):
        with Locations((-24.8389573097, 7)):
            Circle(F27_R)
    extrude(amount=-F28_DEPTH, mode=Mode.SUBTRACT)

    # F29 (size 2 in the source; OpenCascade refuses exactly that, so slightly less here)
    f29_edges = [f11.edges().sort_by_distance(p)[0] for p in [
        (-32.066204, -101.838957, 0),
        (-30.066204, -77.838957, 7),
        (-44.066204, -77.838957, 4),
        (-44.066204, -77.838957, 14),
        (-58.066204, -77.838957, 7),
        (-44.066204, -38.838957, 4),
        (-51.066204, -38.838957, 8),
        (-37.066204, -38.838957, 8),
        (-34.066204, -38.838957, 6),
        (-35.566204, -38.838957, 12),
        (-52.566204, -38.838957, 12),
        (-54.066204, -38.838957, 6),
        (-30.066204, -38.838957, 7),
        (-58.066204, -38.838957, 7),
        (-32.066204, -14.838957, 14),
        (-56.066204, -14.838957, 14),
        (-56.066204, -14.838957, 0),
        (-32.066204, -14.838957, 0),
        (-56.066204, -101.838957, 14),
        (-32.066204, -101.838957, 14),
        (-56.066204, -101.838957, 0),
    ]]
    chamfer(f29_edges, length=F29_SIZE)


solid = f11.part
